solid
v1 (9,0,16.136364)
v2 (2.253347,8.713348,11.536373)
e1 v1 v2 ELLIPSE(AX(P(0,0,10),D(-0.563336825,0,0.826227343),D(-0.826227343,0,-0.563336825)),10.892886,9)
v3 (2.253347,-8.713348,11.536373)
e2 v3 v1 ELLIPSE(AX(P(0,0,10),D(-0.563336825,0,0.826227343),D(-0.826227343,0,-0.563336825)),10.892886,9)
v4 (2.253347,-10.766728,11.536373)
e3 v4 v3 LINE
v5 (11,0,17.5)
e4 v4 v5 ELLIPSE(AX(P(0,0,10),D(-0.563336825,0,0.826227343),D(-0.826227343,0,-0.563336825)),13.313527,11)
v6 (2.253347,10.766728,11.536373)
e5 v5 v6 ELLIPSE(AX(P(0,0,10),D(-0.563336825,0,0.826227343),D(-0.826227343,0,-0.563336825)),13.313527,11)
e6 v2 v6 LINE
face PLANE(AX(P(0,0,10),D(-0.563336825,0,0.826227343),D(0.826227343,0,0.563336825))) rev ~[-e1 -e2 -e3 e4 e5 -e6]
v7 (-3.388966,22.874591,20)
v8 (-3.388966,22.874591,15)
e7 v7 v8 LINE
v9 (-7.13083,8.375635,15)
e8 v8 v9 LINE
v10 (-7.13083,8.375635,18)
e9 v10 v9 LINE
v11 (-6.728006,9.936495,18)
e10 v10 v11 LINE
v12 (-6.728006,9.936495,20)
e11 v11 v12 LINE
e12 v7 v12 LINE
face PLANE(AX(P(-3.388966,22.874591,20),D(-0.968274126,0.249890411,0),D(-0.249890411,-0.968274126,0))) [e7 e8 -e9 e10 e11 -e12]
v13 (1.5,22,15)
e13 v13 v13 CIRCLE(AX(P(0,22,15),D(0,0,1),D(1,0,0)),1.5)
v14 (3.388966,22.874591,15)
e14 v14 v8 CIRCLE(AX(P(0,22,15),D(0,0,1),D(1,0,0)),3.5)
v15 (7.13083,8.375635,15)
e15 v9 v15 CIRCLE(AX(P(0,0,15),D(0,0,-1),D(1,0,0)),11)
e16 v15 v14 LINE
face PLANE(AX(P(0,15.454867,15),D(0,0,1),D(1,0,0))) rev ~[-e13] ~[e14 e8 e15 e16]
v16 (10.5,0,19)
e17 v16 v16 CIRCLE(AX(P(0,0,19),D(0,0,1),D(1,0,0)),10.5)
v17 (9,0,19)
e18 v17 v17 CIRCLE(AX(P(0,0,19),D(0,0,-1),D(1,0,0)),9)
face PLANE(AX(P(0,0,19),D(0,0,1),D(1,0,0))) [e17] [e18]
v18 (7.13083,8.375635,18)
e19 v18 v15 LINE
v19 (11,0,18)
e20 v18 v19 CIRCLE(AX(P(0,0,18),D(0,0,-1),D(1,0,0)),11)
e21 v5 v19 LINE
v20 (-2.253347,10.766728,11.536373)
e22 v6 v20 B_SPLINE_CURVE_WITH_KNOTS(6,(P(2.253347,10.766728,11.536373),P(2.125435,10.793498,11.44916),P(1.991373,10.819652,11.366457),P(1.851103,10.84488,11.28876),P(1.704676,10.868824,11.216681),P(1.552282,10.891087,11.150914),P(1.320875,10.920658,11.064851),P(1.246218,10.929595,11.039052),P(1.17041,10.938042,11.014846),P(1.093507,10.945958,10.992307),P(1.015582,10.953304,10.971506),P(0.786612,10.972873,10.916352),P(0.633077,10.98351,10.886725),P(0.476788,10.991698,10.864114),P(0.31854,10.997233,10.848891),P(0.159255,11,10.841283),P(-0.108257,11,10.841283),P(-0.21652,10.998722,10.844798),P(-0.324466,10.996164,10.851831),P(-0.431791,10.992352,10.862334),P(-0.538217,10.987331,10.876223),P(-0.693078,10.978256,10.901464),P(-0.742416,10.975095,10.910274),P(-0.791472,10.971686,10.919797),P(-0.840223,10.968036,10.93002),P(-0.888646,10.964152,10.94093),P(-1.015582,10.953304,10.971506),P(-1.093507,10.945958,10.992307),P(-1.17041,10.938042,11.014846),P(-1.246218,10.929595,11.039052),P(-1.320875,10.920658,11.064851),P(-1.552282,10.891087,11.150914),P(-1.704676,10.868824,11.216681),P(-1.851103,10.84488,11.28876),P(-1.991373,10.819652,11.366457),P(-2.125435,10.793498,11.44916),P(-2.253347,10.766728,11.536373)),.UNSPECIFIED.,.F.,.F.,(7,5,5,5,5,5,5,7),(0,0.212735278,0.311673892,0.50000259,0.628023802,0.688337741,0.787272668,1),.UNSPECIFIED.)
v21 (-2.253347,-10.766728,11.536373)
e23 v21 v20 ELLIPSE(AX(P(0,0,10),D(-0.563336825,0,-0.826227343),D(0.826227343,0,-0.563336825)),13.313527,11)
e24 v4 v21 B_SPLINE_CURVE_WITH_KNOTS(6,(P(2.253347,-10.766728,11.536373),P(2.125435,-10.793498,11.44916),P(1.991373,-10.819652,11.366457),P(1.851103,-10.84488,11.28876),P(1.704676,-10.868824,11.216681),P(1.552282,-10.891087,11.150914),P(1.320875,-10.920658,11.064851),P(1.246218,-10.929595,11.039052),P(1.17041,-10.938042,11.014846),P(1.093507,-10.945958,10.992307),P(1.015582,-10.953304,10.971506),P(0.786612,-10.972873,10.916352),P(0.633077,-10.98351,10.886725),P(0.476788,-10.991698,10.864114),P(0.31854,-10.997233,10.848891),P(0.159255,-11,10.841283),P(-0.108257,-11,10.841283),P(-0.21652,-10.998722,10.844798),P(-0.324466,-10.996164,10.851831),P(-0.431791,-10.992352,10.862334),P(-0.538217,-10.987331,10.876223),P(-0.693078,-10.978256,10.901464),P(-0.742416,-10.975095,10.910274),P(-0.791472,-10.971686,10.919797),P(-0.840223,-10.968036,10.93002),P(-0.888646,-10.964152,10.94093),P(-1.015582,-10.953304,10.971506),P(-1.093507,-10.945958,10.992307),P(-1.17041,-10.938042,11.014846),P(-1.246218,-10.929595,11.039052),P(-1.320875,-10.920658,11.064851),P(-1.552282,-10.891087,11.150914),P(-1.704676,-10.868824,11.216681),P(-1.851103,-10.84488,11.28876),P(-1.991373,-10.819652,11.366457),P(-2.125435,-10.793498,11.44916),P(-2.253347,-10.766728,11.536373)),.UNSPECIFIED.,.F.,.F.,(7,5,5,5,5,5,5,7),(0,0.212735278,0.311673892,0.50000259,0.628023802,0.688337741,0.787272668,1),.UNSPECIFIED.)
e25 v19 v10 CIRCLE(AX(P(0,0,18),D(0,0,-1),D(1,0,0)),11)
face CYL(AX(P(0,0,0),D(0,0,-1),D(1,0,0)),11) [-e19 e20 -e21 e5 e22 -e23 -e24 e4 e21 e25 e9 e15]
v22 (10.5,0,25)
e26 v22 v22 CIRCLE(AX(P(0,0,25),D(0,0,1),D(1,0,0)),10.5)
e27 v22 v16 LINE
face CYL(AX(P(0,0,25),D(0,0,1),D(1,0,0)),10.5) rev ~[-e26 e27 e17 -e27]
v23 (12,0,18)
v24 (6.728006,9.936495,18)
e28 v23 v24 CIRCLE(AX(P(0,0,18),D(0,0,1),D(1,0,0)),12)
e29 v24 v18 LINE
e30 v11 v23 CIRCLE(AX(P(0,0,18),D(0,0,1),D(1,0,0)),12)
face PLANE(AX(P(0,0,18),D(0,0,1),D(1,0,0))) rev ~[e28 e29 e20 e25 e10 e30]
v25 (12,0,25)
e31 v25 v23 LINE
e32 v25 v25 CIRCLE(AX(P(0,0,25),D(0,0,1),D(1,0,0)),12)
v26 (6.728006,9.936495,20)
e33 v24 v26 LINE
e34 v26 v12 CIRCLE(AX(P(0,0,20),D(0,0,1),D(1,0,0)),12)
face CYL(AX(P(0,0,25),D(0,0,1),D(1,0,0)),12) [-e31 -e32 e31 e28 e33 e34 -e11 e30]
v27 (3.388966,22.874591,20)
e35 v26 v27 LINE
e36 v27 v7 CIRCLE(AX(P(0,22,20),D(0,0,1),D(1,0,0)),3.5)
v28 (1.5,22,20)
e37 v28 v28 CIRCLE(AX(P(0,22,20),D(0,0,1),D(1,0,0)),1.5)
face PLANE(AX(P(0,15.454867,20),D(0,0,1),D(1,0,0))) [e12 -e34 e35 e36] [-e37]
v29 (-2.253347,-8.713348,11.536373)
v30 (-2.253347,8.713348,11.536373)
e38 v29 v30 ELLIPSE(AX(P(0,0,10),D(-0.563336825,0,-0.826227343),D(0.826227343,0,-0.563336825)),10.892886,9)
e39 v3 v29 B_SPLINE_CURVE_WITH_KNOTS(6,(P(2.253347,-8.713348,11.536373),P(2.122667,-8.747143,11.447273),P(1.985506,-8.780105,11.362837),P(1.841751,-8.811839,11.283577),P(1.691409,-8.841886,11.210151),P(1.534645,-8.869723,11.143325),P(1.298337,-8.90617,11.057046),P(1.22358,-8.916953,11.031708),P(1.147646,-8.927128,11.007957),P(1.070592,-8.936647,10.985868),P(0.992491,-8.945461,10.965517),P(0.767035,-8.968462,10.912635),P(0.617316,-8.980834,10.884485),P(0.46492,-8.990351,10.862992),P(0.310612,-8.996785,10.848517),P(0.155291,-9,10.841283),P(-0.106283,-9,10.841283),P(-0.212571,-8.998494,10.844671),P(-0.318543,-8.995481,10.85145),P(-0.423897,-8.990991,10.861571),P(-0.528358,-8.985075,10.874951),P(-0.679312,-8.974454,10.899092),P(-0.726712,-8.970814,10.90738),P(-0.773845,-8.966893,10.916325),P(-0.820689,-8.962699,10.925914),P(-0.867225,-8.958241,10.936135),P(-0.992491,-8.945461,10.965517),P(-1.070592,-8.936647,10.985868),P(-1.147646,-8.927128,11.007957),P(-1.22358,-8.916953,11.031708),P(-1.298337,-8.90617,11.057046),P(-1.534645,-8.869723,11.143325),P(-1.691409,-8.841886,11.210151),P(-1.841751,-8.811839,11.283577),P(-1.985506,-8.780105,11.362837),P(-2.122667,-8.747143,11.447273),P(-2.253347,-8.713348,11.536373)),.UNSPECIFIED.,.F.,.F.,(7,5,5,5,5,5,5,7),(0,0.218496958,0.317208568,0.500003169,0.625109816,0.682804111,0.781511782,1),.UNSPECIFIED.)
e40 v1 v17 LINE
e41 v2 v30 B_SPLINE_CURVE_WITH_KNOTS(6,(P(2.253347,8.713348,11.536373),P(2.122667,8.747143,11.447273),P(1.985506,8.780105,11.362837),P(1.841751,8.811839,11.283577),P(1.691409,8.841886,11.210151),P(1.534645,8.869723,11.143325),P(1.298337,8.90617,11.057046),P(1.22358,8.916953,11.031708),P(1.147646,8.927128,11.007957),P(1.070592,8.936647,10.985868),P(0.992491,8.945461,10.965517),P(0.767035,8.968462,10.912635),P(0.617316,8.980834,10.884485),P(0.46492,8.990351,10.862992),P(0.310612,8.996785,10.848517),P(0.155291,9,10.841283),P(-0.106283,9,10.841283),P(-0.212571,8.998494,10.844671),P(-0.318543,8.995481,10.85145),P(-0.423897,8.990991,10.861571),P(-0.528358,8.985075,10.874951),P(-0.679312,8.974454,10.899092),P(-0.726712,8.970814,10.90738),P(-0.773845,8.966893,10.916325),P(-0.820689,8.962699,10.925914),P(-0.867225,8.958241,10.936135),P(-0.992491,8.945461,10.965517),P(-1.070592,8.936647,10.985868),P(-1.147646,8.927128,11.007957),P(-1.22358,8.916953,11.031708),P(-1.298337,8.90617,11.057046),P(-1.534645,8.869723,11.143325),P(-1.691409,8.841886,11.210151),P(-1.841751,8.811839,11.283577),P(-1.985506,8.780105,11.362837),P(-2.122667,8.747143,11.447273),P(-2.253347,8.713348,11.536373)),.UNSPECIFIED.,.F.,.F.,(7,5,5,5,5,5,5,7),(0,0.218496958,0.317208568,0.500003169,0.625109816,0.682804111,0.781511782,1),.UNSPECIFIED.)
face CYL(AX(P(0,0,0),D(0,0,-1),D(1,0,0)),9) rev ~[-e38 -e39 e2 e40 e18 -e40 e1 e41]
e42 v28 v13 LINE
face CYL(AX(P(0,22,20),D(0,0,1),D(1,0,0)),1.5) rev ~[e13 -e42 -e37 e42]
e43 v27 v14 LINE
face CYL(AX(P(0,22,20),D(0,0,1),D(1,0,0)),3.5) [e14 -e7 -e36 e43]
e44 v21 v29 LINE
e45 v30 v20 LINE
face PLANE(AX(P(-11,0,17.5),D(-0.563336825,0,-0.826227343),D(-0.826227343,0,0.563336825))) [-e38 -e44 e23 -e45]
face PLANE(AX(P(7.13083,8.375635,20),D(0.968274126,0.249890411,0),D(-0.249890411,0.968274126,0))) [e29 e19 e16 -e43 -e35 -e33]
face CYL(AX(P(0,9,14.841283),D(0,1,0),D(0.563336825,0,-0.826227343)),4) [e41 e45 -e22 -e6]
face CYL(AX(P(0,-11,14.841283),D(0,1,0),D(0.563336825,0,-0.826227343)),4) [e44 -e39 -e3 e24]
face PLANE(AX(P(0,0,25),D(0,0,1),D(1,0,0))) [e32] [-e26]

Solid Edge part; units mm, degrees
sketch "Sketch1" plane through (0, 0, 0) normal (0, 0, 1) x (1, 0, 0)
  circle A0 centre (0, 0) radius 9
  circle A1 centre (0, 0) radius 11
extrude "Protrusion1" add sketch "Sketch1" along normal blind 25
sketch "Sketch2" plane through (0, 0, 20) normal (0, 0, 1) x (1, 0, 0)
  circle A0 centre (0, 22) radius 1.5
  line L0 (-3.389, 22.8746) -> (-7.1308, 8.3756)
  arc A1 (-7.1308, 8.3756) -> (7.1308, 8.3756) centre (0, 0) cw
  line L1 (7.1308, 8.3756) -> (3.389, 22.8746)
  arc A2 (3.389, 22.8746) -> (-3.389, 22.8746) centre (0, 22) ccw
extrude "Extrusionsausprägung_3" add sketch "Sketch2" against normal blind 5
sketch "Sketch3" plane through (0, 0, 0) normal (0, -1, 0) x (1, 0, 0)
  line L0 (-11, 17.5) -> (0, 10)
  line L1 (0, 10) -> (11, 17.5)
  dimension "D1" = 10
  dimension "D2" = 7.5
  dimension "D3" = 7.5
extrude "Cutout1" cut sketch "Sketch3" along normal through all and the other way through all material side at (-5.5282, 0, 13.7087)
fillet "Verrundung_2" radius 4 2 edges at (0, -10, 10) (0, 10, 10)
sketch "Sketch4" plane through (0, 0, 25) normal (0, 0, 1) x (1, 0, 0)
  circle A0 centre (0, 0) radius 12
  circle A1 centre (0, 0) radius 9
extrude "Extrusionsausprägung_4" add sketch "Sketch4" against normal blind 7
sketch "Sketch5" plane through (0, 0, 25) normal (0, 0, 1) x (1, 0, 0)
  circle A0 centre (0, 0) radius 10.5
  dimension "D1" = 21
extrude "Extrusionsausschnitt_7" cut sketch "Sketch5" against normal blind 6
properties part number "094" material "Aluminiumlegierung:3.0205, Al 99.0, EN-AW 1200"
